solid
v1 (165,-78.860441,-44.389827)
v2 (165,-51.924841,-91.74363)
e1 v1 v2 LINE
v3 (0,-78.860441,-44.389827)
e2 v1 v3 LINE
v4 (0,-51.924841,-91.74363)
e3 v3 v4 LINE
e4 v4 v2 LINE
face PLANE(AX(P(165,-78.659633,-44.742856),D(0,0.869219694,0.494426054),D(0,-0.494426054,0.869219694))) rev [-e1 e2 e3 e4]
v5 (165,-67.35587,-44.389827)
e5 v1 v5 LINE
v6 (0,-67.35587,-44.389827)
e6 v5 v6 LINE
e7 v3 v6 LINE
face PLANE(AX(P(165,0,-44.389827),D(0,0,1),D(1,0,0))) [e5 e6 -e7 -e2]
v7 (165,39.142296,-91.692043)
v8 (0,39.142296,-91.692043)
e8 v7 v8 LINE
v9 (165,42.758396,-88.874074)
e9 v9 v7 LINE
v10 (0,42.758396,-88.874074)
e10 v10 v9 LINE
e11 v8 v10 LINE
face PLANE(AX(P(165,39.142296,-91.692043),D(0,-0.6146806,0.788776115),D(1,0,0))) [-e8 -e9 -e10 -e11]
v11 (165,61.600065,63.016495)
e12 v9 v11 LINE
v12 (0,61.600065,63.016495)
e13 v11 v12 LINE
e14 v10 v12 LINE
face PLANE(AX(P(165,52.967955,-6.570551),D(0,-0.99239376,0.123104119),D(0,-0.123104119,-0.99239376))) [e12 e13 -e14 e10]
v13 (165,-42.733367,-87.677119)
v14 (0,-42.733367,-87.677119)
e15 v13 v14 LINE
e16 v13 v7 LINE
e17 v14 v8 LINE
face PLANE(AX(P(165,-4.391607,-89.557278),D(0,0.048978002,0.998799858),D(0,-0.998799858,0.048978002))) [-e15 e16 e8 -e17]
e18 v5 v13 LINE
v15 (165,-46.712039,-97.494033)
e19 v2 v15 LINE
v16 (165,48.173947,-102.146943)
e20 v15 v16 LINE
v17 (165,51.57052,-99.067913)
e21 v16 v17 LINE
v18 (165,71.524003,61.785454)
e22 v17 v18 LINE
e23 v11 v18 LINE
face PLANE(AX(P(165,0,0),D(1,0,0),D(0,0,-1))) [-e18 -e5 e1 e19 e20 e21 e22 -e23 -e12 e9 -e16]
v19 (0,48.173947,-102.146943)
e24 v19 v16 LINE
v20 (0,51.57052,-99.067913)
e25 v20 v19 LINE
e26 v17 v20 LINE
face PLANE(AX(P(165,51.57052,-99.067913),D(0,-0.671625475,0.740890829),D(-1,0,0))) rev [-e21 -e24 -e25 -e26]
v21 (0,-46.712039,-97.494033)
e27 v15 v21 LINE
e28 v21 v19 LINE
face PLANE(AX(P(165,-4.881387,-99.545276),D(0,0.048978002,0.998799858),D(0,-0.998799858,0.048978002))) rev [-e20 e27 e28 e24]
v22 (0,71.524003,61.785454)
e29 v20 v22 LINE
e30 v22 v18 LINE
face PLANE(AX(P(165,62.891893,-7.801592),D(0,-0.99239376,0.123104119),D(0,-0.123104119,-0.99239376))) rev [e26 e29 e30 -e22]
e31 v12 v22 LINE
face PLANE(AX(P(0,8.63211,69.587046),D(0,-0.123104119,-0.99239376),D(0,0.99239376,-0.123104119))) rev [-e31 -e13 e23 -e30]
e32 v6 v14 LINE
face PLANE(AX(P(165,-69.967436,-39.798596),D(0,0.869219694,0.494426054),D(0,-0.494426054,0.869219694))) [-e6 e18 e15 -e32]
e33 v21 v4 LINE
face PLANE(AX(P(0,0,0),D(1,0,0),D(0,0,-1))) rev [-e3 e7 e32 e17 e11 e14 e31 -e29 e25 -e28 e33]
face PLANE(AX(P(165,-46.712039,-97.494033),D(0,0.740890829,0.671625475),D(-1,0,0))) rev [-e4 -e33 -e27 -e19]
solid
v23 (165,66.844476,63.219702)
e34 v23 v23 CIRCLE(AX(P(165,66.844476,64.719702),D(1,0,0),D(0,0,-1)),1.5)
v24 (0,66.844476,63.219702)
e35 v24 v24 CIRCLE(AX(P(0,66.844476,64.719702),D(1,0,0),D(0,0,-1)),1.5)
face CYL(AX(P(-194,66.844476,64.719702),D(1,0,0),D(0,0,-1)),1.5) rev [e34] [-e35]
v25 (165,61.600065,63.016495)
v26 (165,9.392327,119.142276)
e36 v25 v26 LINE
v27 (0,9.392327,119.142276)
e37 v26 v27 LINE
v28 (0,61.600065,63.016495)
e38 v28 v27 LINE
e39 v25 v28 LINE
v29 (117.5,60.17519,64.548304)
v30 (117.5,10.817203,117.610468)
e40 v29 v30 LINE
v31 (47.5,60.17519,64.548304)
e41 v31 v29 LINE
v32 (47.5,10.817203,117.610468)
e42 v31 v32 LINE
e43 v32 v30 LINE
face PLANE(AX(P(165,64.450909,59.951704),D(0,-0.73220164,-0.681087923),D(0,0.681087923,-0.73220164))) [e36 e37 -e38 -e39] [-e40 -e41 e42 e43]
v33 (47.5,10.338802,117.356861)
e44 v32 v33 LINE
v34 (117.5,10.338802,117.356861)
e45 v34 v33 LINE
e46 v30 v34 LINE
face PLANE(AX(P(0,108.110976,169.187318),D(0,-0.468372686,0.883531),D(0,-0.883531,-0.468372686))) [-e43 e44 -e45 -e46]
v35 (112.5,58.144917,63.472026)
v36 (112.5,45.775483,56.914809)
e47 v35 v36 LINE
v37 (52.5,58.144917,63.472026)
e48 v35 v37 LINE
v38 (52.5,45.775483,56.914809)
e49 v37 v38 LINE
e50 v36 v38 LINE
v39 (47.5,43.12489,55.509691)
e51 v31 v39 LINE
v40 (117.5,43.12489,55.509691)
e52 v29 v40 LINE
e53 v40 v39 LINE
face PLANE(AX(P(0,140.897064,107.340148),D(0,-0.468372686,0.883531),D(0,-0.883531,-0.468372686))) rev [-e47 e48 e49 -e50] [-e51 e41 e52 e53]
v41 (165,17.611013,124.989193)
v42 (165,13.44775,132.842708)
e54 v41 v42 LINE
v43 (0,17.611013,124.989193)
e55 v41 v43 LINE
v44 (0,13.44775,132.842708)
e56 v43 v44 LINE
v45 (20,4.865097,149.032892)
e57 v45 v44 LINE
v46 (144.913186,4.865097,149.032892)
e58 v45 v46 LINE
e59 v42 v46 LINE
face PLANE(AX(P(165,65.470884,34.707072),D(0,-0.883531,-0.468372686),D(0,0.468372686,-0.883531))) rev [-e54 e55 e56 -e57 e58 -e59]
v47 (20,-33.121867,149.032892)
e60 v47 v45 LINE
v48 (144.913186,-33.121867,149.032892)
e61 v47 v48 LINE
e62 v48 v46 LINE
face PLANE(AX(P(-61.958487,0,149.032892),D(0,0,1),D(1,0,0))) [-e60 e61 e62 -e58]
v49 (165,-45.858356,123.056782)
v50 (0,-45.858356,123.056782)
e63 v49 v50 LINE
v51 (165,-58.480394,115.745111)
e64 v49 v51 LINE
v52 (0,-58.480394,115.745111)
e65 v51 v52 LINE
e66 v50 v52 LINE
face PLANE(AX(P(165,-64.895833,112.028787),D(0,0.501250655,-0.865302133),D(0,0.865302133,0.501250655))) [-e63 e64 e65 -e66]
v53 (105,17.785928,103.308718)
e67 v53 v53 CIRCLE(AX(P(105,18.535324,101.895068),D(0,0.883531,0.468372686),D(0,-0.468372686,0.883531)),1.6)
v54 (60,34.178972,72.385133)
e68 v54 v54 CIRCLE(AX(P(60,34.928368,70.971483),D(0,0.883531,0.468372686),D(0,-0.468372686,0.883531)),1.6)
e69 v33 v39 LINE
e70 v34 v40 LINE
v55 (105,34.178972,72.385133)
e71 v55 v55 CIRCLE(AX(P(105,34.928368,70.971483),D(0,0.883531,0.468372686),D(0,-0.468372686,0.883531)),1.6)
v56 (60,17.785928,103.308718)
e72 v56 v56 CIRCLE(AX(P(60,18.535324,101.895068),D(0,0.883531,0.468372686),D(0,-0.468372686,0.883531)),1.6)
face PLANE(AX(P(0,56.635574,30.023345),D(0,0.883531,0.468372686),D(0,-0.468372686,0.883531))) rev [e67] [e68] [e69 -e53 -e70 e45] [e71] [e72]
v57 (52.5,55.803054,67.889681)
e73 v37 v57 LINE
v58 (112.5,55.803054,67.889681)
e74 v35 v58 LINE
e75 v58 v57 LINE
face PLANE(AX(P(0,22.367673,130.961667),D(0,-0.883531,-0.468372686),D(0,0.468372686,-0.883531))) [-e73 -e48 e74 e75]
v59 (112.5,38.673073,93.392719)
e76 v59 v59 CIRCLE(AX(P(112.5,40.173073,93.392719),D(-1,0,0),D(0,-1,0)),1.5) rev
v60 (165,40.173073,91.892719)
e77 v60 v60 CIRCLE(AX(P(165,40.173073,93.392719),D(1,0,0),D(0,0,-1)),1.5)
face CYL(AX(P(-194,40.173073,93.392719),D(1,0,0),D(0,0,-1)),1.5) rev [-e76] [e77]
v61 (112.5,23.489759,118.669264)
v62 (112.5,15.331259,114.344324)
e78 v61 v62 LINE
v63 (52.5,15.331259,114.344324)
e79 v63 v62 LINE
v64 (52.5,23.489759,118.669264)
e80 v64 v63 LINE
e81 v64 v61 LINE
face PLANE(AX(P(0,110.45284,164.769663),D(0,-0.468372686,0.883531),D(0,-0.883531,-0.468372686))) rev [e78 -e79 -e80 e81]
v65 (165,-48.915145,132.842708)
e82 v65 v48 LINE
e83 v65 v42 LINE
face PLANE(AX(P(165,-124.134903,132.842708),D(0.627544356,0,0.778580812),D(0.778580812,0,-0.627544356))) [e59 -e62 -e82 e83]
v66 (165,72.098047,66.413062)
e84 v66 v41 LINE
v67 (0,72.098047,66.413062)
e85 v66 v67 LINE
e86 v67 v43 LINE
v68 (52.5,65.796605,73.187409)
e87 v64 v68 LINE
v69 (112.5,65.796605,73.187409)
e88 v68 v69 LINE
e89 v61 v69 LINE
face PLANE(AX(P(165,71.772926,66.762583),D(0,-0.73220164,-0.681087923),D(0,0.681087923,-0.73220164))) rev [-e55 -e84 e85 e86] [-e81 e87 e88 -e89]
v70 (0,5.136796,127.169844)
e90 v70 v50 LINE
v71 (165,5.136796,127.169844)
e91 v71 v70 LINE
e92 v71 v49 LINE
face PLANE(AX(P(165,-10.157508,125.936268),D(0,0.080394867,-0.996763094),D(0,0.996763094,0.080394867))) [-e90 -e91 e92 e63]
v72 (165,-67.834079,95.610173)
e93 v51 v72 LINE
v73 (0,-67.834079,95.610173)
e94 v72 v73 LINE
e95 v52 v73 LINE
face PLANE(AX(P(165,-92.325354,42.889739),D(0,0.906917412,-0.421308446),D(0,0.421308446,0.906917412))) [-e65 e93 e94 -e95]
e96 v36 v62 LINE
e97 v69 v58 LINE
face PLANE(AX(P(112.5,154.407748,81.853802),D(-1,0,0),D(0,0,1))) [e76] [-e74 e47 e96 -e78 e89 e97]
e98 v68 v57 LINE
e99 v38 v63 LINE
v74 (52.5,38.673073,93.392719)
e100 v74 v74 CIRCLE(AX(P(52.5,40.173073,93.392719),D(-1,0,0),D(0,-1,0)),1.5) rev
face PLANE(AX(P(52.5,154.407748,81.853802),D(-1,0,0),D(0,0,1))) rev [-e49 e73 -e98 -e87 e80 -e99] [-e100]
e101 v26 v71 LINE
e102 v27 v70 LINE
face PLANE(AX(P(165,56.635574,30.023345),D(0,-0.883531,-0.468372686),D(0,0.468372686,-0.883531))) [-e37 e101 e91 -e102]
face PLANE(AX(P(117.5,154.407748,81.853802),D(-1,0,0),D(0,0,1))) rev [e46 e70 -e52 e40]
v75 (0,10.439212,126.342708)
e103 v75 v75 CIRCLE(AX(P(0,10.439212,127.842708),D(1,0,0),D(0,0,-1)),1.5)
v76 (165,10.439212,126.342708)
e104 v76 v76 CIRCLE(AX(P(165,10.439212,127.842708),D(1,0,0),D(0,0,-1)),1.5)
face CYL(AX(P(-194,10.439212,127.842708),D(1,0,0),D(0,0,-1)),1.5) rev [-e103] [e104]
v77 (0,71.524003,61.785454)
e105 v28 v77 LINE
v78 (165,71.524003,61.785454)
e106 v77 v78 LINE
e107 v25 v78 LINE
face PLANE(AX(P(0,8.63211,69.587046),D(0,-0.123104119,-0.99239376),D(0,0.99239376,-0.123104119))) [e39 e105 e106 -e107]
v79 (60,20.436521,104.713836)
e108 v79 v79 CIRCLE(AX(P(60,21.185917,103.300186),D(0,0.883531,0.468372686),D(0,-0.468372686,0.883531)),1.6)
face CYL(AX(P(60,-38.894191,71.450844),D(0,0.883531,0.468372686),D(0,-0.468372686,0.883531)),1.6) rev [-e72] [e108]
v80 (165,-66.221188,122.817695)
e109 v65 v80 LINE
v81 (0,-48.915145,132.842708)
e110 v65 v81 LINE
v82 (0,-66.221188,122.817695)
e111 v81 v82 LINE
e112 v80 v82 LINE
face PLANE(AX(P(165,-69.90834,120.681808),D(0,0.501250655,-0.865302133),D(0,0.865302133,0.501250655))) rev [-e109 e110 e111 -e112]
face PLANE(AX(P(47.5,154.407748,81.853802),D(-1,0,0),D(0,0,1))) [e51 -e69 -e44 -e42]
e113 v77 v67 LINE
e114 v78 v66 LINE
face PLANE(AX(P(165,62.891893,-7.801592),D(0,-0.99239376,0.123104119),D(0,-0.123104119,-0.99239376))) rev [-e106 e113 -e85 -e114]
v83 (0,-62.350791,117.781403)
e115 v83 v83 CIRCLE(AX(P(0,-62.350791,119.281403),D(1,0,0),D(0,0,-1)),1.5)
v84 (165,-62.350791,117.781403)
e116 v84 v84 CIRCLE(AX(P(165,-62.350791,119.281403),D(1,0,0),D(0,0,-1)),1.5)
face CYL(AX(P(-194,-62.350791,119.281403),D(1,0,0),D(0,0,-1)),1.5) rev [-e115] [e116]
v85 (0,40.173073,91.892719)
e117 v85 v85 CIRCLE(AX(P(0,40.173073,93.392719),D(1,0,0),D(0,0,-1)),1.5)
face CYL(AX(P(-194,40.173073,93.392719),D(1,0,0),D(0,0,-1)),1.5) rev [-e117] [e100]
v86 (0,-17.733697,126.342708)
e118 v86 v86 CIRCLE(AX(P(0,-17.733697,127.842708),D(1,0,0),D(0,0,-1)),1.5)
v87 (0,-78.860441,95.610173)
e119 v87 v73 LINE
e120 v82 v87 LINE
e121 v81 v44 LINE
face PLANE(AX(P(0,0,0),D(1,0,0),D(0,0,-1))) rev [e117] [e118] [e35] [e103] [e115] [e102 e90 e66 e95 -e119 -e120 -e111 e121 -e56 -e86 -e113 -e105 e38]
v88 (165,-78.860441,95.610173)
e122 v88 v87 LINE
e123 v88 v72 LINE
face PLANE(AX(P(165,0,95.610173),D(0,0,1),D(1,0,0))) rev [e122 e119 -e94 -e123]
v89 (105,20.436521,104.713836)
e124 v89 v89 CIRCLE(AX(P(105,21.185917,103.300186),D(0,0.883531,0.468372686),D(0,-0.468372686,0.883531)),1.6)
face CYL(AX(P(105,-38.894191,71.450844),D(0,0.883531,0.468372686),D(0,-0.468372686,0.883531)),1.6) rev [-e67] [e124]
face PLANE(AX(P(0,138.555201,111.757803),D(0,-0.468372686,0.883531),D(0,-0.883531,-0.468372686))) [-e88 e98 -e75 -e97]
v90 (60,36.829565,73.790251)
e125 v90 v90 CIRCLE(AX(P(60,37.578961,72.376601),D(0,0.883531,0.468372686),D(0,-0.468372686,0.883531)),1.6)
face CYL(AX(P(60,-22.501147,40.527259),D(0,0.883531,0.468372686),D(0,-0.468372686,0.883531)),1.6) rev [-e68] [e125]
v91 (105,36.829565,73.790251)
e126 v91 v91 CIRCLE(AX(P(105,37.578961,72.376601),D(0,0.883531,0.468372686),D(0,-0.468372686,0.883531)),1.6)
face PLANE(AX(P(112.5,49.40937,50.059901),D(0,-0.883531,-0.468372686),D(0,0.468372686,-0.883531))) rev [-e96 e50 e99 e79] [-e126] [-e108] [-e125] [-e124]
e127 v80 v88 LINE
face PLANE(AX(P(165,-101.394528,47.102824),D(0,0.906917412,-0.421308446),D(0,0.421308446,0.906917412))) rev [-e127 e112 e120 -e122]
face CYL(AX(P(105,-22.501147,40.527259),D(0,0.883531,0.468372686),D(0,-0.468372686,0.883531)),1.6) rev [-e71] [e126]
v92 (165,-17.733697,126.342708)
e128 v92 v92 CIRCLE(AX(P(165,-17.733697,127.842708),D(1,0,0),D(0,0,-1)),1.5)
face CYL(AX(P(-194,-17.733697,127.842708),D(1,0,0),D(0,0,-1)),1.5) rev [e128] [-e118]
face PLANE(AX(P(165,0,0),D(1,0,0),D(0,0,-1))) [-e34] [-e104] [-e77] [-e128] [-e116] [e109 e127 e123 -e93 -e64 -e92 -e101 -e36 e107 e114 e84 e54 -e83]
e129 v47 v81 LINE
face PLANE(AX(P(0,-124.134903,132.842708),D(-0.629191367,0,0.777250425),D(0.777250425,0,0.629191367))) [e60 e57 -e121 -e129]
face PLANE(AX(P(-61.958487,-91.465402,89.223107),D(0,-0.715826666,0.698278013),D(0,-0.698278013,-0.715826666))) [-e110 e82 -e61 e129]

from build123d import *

# Parameters (mm, degrees)
EXTRUDE_1_DEPTH          = 165
CHAMFER_START            = -1
CHAMFER_2_DEPTH          = 167
CHAMFER_2_2_DEPTH        = 165
CHAMFER_3_SIZE           = 2
CHAMFER_3_SIZE2          = 6.502897882
EXTRUDE_2_DEPTH          = 165
CUT_EXTRUDE_1_DEPTH      = 129
CUT_EXTRUDE_1_DEPTH_BACK = 90
SKETCH_19_R              = 1.5
CUT_EXTRUDE_4_DEPTH      = 359
EXTRUDE_5_REACH          = 253.104
SKETCH_25_W              = 60
SKETCH_25_H              = 60
CUT_EXTRUDE_6_DEPTH      = 68
EXTRUDE_6_REACH          = 275.755
SKETCH_26_W              = 60
SKETCH_26_H              = 3
SKETCH_27_R              = 1.6
CUT_EXTRUDE_7_DEPTH      = 68
SKETCH_28_W              = 70
SKETCH_28_H              = 14
CUT_EXTRUDE_8_DEPTH      = 5
SKETCH_29_W              = 5
SKETCH_29_H              = 14
EXTRUDE_7_DEPTH          = 5


with BuildPart() as part:
    # 草图1 → 凸台-拉伸1 (new body)
    with BuildSketch(Plane(origin=(0, 0, 0), x_dir=(0, 0, -1), z_dir=(1, 0, 0))):
        Polygon((-119.14227599, 9.392327421), (-63.016495383, 61.600065372), (91.851255652, 42.389083929), (87.677118577, -42.733366558), (44.389827178, -67.355869721), (44.389827178, -78.860441079), (97.396076824, -48.709639137), (102.293876984, 51.170346614), (-66.413062293, 72.098046913), (-124.989193473, 17.611013079), (-137.666400315, 10.890640602), (-132.842708295, -48.915145032), (-122.817695194, -66.221187685), (-95.610172822, -78.860441079), (-95.610172822, -67.834078741), (-115.745111112, -58.48039399), (-123.056782297, -45.858356282), (-127.169844392, 5.136796181), align=None)
    extrude(amount=EXTRUDE_1_DEPTH)

    # 倒角2: read off the stored shape, not the designer's step
    # 倒角2 outline → 倒角2 (cut)
    with BuildSketch(Plane.YZ.offset(CHAMFER_START)):
        Polygon((51.170346614, -102.293876984), (51.570519841, -99.067913343), (48.173947041, -102.146942979), align=None)
    extrude(amount=CHAMFER_2_DEPTH, mode=Mode.SUBTRACT)

    # Chamfer 2 2 outline → Chamfer 2 2 (add)
    with BuildSketch(Plane.YZ):
        Polygon((42.389083929, -91.851255652), (42.758396287, -88.874074371), (39.142296059, -91.692043393), align=None)
    extrude(amount=CHAMFER_2_2_DEPTH)

    # 倒角3
    chamfer_3_edges = [part.edges().sort_by_distance(p)[0] for p in [
        (82.5, -48.709639137, -97.396076824),
    ]]
    chamfer_3_side = [part.faces().sort_by_distance(p)[0] for p in [
        (82.5, -0.267846048, -99.771509901),
    ]]
    chamfer(chamfer_3_edges, length=CHAMFER_3_SIZE, length2=CHAMFER_3_SIZE2, reference=chamfer_3_side[0])

    # 草图12 → 凸台-拉伸2 (add)
    with BuildSketch(Plane(origin=(165, 0, 0), x_dir=(0, 0, -1), z_dir=(1, 0, 0))):
        Polygon((-149.032892218, 4.865097255), (-149.032892218, -33.12186714), (-132.842708295, -48.915145032), (-137.666400315, 10.890640602), align=None)
    extrude(amount=-EXTRUDE_2_DEPTH)

    # 草图13 → 切除-拉伸1 (cut, two sides: drawn at the far end of the back side and taken through both)
    with BuildSketch(Plane.XZ.offset(-4.865097255).offset(-CUT_EXTRUDE_1_DEPTH_BACK)):
        Polygon((0, 149.032892218), (0, 132.842708295), (20, 149.032892218), align=None)
        Polygon((144.913186348, 149.032892218), (165, 149.032892218), (165, 132.842708295), align=None)
    extrude(amount=CUT_EXTRUDE_1_DEPTH + CUT_EXTRUDE_1_DEPTH_BACK, mode=Mode.SUBTRACT)


with BuildPart() as body_2:
    # Split Bodies 1: read off the stored shape, not the designer's step
    # Split Bodies 1: the piece on the far side of the plane
    add(part.part)
    split(bisect_by=Plane(origin=(0, 8.632109926, 69.587046078), x_dir=(1, 0, 0), z_dir=(0, 0.12310411940930002, 0.9923937604522012)), keep=Keep.BOTTOM)


with BuildPart() as part_1:
    add(part.part)

    # Split Bodies 1
    split(bisect_by=Plane(origin=(0, 8.632109926, 69.587046078), x_dir=(1, 0, 0), z_dir=(0, 0.12310411940930002, 0.9923937604522012)), keep=Keep.TOP)

    # 草图19 → 切除-拉伸4 (cut)
    with BuildSketch(Plane(origin=(165, 0, 0), x_dir=(0, 0, -1), z_dir=(1, 0, 0))):
        with Locations((-127.842708295, 10.4392122)):
            Circle(SKETCH_19_R)
        with Locations((-127.842708295, -17.733697424)):
            Circle(SKETCH_19_R)
        with Locations((-119.281403153, -62.350790838)):
            Circle(SKETCH_19_R)
        with Locations((-93.392718519, 40.173073312)):
            Circle(SKETCH_19_R)
        with Locations((-64.719702306, 66.844476373)):
            Circle(SKETCH_19_R)
    extrude(amount=-CUT_EXTRUDE_4_DEPTH, mode=Mode.SUBTRACT)

    # 凸台-拉伸5: up to this plane
    extrude_5_end = Plane(origin=(165, 64.450909172, 59.951703842), z_dir=(0, -0.7322016397474544, -0.6810879229226864))
    # 草图24 → 凸台-拉伸5 (add, up to the surface)
    with BuildSketch(Plane(origin=(0, 56.635574201, 30.023344955), x_dir=(1, 0, 0), z_dir=(0, 0.8835309997249798, 0.4683726855026645)), mode=Mode.PRIVATE) as extrude_5_sk1:
        Polygon((112.5, -50.383912681), (117.5, -48.140229484), (117.5, -28.846011859), (47.5, -28.846011859), (47.5, -79.551794233), (52.5, -77.308111036), (52.5, -33.846011859), (112.5, -33.846011859), align=None)
    extrude_5_tool1 = split(extrude(extrude_5_sk1.sketch, amount=EXTRUDE_5_REACH, mode=Mode.PRIVATE), bisect_by=extrude_5_end, keep=Keep.BOTH, mode=Mode.PRIVATE)
    add(extrude_5_tool1.solids().sort_by_distance((49.646128, 20.270483, 98.621891))[0])
    # 草图24 → 凸台-拉伸5 (add, up to the surface)
    with BuildSketch(Plane(origin=(0, 56.635574201, 30.023344955), x_dir=(1, 0, 0), z_dir=(0, 0.8835309997249798, 0.4683726855026645)), mode=Mode.PRIVATE) as extrude_5_sk2:
        Polygon((117.5, -98.846011859), (117.5, -48.140229484), (112.5, -50.383912681), (112.5, -93.846011859), (52.5, -93.846011859), (52.5, -77.308111036), (47.5, -79.551794233), (47.5, -98.846011859), align=None)
    extrude_5_tool2 = split(extrude(extrude_5_sk2.sketch, amount=EXTRUDE_5_REACH, mode=Mode.PRIVATE), bisect_by=extrude_5_end, keep=Keep.BOTH, mode=Mode.PRIVATE)
    add(extrude_5_tool2.solids().sort_by_distance((48.364354, 14.857244, 108.833341))[0])

    # 草图25 → 切除-拉伸6 (cut)
    with BuildSketch(Plane(origin=(0, 56.635574201, 30.023344955), x_dir=(-1, 0, 0), z_dir=(0, -0.8835309997249798, -0.46837268550266453))):
        with Locations((-82.5, -63.846011859)):
            Rectangle(SKETCH_25_W, SKETCH_25_H)
    extrude(amount=-CUT_EXTRUDE_6_DEPTH, mode=Mode.SUBTRACT)

    # 草图26 → 凸台-拉伸6 (add, up to next)
    with BuildSketch(Plane(origin=(0, -43.954908598, 82.915860678), x_dir=(-1, 0, 0), z_dir=(0, 0.4683726855026646, -0.8835309997249798)), mode=Mode.PRIVATE) as extrude_6_sk1:
        with Locations((-82.5, 65.601400198)):
            Rectangle(SKETCH_26_W, SKETCH_26_H)
    extrude_6_tool1 = extrude(extrude_6_sk1.sketch, amount=EXTRUDE_6_REACH, mode=Mode.PRIVATE) - part_1.part
    add(extrude_6_tool1.solids().sort_by_distance((82.5, 14.005962, 113.641765))[0])

    # 草图27 → 切除-拉伸7 (cut)
    with BuildSketch(Plane(origin=(0, 59.2861672, 31.428463012), x_dir=(1, 0, 0), z_dir=(0, 0.8835309997249797, 0.46837268550266475))):
        with Locations(Location((60, -46.346011859, 0), (0, 0, 270))):
            Circle(SKETCH_27_R)
        with Locations(Location((105, -46.346011859, 0), (0, 0, 270))):
            Circle(SKETCH_27_R)
        with Locations(Location((60, -81.346011859, 0), (0, 0, 270))):
            Circle(SKETCH_27_R)
        with Locations(Location((105, -81.346011859, 0), (0, 0, 270))):
            Circle(SKETCH_27_R)
    extrude(amount=-CUT_EXTRUDE_7_DEPTH, mode=Mode.SUBTRACT)

    # 草图28 → 切除-拉伸8 (cut)
    with BuildSketch(Plane(origin=(0, -13.51068404, 25.486345695), x_dir=(-1, 0, 0), z_dir=(0, 0.4683726855026646, -0.8835309997249798))):
        with Locations((-82.5, 74.101400198)):
            Rectangle(SKETCH_28_W, SKETCH_28_H)
    extrude(amount=-CUT_EXTRUDE_8_DEPTH, mode=Mode.SUBTRACT)

    # 草图29 → 凸台-拉伸7 (add)
    with BuildSketch(Plane(origin=(0, -15.852547468, 29.904000694), x_dir=(-1, 0, 0), z_dir=(0, 0.4683726855026646, -0.8835309997249798))):
        with Locations((-115, 74.101400198)):
            Rectangle(SKETCH_29_W, SKETCH_29_H)
        with Locations((-50, 74.101400198)):
            Rectangle(SKETCH_29_W, SKETCH_29_H)
    extrude(amount=EXTRUDE_7_DEPTH)


solid = Compound([body_2.part, part_1.part])
